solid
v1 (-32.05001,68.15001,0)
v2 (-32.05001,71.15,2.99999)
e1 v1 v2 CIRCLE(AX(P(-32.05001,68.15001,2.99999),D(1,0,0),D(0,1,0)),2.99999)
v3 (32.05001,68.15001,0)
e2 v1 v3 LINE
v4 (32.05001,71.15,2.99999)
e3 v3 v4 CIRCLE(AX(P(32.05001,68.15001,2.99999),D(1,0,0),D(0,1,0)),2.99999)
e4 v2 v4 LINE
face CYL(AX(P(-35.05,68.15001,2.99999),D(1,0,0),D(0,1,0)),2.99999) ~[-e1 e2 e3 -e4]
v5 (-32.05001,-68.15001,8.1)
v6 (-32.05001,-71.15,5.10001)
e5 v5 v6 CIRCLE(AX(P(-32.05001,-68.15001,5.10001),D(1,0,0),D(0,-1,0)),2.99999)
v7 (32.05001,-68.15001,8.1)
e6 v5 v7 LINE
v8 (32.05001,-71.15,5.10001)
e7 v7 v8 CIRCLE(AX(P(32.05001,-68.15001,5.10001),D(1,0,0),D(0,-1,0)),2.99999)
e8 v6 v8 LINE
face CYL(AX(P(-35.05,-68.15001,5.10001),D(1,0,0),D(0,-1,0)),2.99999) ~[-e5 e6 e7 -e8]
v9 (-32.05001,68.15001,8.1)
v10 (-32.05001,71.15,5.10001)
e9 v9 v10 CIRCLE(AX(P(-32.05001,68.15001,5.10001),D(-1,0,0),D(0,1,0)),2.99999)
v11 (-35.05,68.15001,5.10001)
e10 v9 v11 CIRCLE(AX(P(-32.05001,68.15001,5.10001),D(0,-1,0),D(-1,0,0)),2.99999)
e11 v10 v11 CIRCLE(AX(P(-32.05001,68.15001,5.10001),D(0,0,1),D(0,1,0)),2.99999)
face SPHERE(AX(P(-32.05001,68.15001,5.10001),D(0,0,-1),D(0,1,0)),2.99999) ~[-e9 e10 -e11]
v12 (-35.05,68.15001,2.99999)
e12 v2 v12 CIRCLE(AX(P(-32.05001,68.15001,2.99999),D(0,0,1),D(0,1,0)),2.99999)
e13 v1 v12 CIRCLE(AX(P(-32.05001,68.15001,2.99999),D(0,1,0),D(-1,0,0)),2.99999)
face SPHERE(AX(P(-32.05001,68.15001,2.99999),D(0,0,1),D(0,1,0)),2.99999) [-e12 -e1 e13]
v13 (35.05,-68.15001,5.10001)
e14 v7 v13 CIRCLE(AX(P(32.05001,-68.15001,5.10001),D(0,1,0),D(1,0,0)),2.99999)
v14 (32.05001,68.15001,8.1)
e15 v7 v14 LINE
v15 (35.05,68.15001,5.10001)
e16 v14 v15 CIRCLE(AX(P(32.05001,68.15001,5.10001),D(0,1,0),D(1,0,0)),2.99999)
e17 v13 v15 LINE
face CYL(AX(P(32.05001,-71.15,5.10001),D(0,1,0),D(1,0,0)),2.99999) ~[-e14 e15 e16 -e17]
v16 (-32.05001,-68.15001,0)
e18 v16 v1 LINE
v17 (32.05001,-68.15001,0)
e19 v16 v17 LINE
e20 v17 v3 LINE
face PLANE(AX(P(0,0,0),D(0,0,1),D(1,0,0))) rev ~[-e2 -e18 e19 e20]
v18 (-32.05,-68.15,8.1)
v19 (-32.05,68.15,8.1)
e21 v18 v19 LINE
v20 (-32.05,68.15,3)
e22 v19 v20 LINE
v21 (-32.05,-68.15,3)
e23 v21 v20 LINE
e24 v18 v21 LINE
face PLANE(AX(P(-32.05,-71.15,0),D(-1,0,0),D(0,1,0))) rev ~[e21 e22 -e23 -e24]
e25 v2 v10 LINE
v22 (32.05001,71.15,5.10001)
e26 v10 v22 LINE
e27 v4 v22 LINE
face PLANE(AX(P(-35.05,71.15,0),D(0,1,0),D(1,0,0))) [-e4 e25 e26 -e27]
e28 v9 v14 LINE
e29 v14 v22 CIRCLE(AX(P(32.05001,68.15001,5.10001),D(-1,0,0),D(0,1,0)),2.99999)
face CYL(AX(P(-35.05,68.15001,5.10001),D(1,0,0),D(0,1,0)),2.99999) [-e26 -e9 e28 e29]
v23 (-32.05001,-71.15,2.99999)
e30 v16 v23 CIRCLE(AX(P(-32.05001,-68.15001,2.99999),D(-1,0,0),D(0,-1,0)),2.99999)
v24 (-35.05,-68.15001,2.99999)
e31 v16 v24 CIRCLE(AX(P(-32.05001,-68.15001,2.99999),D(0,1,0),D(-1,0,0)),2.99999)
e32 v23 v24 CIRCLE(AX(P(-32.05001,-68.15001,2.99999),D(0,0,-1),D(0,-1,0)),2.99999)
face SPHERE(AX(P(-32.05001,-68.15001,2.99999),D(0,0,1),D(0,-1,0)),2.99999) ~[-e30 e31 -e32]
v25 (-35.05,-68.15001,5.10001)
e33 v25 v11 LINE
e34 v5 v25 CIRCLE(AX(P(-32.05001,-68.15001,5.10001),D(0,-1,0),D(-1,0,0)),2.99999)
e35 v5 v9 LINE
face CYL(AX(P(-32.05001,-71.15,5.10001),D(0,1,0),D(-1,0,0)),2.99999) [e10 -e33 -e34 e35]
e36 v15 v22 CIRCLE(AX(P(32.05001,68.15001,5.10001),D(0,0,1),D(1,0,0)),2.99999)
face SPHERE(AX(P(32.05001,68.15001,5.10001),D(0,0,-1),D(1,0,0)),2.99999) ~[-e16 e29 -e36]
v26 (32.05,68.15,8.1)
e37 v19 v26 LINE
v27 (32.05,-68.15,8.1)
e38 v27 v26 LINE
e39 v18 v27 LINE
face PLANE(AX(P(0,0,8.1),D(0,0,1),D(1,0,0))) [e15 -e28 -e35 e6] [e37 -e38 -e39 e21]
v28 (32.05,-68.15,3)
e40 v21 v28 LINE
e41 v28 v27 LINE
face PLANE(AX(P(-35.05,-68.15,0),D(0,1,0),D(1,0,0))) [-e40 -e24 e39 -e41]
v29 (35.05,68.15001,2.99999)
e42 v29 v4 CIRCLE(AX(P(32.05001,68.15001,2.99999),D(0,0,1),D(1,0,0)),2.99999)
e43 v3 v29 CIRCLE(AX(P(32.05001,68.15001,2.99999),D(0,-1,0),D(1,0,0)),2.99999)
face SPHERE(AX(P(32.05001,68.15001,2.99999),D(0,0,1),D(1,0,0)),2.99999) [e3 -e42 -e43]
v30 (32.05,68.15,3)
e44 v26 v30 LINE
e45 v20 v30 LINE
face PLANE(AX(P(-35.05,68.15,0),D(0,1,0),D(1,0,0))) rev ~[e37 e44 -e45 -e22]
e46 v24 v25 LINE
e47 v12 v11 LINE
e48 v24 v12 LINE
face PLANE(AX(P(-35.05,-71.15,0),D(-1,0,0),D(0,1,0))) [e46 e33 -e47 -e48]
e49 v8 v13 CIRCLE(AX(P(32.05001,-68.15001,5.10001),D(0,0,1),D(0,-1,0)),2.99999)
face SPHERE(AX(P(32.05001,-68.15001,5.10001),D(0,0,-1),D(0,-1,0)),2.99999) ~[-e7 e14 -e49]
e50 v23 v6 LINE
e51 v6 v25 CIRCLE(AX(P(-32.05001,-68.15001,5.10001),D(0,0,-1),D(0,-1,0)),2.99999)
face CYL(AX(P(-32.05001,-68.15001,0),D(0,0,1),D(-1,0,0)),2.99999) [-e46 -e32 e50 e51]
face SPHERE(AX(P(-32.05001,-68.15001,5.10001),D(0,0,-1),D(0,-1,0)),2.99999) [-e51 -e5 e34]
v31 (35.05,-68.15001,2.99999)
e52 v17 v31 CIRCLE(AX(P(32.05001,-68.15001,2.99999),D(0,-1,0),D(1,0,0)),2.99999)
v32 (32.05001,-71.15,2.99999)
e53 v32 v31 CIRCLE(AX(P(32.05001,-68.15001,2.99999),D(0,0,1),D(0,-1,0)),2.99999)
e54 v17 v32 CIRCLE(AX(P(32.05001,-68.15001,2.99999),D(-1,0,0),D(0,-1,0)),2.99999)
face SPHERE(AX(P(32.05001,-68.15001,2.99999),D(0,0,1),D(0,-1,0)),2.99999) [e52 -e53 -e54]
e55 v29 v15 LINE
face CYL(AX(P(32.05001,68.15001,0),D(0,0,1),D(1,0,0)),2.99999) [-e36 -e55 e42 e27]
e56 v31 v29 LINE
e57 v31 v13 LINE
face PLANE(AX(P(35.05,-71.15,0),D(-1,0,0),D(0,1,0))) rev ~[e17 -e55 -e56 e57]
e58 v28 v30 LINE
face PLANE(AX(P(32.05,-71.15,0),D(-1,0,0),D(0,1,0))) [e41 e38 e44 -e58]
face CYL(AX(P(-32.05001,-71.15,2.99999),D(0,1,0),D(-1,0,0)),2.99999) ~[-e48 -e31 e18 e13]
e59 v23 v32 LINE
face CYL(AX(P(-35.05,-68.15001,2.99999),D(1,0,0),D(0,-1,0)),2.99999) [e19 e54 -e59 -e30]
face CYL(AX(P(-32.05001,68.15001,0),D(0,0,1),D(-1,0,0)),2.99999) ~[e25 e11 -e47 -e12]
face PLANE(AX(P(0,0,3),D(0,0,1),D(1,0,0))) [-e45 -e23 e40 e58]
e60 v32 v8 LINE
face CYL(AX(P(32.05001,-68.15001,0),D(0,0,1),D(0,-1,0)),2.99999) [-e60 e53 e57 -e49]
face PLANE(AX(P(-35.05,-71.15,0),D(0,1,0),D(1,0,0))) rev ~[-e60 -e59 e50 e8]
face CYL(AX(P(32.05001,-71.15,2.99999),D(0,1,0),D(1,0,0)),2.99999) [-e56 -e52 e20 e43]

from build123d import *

# Parameters (mm, degrees)
F0_W     = 70.1
F0_H     = 142.3
F1_DEPTH = 8.1
F2_T     = -3
F3_R     = 2.99999


# Not quite as in the source:
# - a fillet or chamfer is up to 0.001 mm smaller than in the source, because OpenCascade refuses the exact size


with BuildPart() as f1:
    # F0 (on Top) → F1 (new body)
    with BuildSketch(Plane.XY):
        Rectangle(F0_W, F0_H)
    extrude(amount=F1_DEPTH)

    # F2
    f2_openings = [f1.faces().sort_by_distance(p)[0] for p in [
        (0, 0, 8.1),
    ]]
    offset(amount=F2_T, openings=f2_openings)

    # F3 (radius 3 in the source; OpenCascade refuses exactly that, so slightly less here)
    f3_edges = [f1.edges().sort_by_distance(p)[0] for p in [
        (-35.05, -71.15, 4.05),
        (35.05, -71.15, 4.05),
        (0, -71.15, 0),
        (0, -71.15, 8.1),
        (35.05, 71.15, 4.05),
        (35.05, 0, 0),
        (35.05, 0, 8.1),
        (-35.05, 71.15, 4.05),
        (0, 71.15, 0),
        (0, 71.15, 8.1),
        (-35.05, 0, 0),
        (-35.05, 0, 8.1),
    ]]
    fillet(f3_edges, radius=F3_R)


solid = f1.part
